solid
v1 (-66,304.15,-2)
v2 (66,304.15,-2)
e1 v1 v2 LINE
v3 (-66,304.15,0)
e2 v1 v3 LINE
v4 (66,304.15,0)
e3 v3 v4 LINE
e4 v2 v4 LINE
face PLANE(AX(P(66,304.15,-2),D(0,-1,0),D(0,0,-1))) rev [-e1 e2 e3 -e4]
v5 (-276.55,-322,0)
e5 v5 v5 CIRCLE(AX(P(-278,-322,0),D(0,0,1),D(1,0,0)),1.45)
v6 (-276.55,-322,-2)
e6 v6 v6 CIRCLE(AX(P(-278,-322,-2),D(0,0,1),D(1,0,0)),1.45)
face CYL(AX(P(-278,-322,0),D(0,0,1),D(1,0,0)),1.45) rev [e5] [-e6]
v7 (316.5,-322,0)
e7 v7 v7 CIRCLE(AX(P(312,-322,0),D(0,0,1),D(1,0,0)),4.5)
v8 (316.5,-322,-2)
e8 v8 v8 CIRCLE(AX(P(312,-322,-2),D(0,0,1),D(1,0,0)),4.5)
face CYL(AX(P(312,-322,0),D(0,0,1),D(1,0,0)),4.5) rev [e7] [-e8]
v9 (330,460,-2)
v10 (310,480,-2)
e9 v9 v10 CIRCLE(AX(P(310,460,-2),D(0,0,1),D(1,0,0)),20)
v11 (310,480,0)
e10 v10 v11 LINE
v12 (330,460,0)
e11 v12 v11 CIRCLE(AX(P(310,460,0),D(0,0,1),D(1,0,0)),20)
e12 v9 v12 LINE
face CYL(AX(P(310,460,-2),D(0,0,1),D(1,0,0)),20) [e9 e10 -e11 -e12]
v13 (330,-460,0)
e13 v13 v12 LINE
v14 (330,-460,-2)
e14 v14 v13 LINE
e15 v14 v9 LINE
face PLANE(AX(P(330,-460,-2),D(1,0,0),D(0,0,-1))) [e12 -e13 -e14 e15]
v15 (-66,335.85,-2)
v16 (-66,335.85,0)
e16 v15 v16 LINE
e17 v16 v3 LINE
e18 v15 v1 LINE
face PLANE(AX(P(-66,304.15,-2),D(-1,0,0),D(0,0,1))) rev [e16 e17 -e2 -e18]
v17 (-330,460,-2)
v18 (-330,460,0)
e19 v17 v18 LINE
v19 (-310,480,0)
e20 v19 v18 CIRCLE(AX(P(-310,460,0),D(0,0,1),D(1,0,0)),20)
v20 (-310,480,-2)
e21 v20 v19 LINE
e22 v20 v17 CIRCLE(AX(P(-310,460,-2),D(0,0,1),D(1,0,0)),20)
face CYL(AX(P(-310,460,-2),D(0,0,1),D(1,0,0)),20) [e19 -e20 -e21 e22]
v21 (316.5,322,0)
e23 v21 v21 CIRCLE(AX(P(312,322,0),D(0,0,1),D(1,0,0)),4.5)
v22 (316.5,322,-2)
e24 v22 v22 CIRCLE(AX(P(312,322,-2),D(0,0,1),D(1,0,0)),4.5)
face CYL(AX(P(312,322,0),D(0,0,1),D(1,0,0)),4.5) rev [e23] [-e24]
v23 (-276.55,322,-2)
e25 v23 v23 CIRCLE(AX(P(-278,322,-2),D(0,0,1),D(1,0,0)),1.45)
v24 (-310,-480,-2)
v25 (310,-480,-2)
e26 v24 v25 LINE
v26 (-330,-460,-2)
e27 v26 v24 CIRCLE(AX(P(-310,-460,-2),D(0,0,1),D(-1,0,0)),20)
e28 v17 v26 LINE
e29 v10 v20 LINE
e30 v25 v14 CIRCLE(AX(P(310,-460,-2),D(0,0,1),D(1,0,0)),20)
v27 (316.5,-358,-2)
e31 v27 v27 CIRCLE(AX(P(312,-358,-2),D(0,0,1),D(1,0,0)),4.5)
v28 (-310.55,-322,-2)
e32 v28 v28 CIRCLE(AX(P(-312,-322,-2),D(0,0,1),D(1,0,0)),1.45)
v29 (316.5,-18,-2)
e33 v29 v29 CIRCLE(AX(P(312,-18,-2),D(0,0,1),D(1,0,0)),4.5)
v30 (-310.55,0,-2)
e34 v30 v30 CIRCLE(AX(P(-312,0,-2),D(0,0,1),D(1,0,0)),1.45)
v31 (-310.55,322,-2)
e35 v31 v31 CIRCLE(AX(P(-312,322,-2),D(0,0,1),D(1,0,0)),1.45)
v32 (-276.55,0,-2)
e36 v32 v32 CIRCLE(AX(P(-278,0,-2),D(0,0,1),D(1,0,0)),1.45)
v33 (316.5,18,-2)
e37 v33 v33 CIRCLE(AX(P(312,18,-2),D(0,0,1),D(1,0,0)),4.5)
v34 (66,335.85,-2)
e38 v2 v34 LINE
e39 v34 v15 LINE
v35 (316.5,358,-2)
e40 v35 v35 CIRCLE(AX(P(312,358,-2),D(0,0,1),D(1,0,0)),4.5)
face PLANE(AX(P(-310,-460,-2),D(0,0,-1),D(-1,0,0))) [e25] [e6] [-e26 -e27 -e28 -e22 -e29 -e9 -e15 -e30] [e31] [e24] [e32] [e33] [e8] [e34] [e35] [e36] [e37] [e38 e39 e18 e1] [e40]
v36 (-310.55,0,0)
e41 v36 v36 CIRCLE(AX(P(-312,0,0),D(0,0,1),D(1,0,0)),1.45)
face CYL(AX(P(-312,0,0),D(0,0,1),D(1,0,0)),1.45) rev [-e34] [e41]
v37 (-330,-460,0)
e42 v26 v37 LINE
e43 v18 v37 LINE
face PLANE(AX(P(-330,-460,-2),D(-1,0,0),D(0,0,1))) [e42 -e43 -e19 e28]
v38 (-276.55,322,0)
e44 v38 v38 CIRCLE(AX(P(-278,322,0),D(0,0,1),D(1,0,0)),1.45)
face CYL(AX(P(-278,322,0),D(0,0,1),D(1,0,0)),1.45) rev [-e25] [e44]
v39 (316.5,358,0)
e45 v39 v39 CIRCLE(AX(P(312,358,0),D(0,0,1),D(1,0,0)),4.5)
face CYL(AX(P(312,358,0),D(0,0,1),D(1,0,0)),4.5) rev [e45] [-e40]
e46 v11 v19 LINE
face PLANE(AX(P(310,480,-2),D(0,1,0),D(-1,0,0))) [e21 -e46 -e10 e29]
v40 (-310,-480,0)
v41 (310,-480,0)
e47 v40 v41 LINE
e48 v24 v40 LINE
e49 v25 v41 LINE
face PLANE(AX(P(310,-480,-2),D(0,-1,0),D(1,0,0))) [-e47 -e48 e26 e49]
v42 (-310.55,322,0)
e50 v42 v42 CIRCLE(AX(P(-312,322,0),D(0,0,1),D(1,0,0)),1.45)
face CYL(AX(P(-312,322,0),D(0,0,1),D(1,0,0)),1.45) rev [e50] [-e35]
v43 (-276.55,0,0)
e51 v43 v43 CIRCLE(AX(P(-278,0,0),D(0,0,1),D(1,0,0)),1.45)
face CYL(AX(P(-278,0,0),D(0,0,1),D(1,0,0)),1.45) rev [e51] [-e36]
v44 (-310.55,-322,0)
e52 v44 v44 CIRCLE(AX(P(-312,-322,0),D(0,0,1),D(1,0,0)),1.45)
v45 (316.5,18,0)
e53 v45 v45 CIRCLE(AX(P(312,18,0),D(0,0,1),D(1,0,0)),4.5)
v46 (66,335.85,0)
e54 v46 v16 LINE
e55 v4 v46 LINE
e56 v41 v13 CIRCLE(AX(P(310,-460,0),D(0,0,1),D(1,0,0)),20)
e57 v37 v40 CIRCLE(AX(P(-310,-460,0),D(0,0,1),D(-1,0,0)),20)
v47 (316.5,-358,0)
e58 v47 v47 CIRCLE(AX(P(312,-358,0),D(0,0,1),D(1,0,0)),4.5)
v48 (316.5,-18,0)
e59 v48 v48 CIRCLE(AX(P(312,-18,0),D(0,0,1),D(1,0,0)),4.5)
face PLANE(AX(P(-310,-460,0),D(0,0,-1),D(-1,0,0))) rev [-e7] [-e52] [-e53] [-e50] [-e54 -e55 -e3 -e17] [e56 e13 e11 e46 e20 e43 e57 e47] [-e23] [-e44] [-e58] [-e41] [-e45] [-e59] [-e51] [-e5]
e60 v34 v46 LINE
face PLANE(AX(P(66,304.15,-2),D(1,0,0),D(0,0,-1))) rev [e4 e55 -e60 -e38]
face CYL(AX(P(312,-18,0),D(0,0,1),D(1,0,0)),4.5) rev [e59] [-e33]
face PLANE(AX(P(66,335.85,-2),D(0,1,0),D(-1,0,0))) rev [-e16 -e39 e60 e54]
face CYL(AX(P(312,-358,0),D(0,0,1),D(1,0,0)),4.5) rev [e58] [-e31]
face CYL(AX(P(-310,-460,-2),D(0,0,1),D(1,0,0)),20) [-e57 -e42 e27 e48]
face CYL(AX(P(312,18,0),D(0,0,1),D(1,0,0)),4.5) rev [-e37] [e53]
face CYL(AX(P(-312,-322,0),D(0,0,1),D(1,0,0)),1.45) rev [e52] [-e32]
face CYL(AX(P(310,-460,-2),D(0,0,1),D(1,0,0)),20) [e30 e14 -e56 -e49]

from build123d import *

# Parameters (mm, degrees)
BASE_FLANGE1_DEPTH     = 2
M8_CLEARANCE_HOLE1_D   = 9
SKETCH8_W              = 132
SKETCH8_H              = 31.7
CUT_EXTRUDE1_DEPTH     = 10
M2_5_CLEARANCE_HOLE2_D = 2.9


# Sheet-metal steps are written as plain solids
with BuildPart() as part:
    # Sketch1 → Base-Flange1 (new body)
    with BuildSketch(Plane.XY):
        with BuildLine():
            Line((310, -480), (-310, -480))
            ThreePointArc((-310, -480), (-324.142135624, -474.142135624), (-330, -460))
            Line((-330, -460), (-330, 460))
            ThreePointArc((-330, 460), (-324.142135624, 474.142135624), (-310, 480))
            Line((-310, 480), (310, 480))
            ThreePointArc((310, 480), (324.142135624, 474.142135624), (330, 460))
            Line((330, 460), (330, -460))
            ThreePointArc((330, -460), (324.142135624, -474.142135624), (310, -480))
        make_face()
    extrude(amount=-BASE_FLANGE1_DEPTH)

    # M8 Clearance Hole1 (through all)
    with Locations(Plane.XY):
        with Locations((312, 358), (312, 322), (312, 18), (312, -18), (312, -322), (312, -358)):
            Hole(M8_CLEARANCE_HOLE1_D / 2)

    # Sketch8 → Cut-Extrude1 (cut)
    with BuildSketch(Plane.XY):
        with Locations((0, 320)):
            Rectangle(SKETCH8_W, SKETCH8_H)
    extrude(amount=-CUT_EXTRUDE1_DEPTH, mode=Mode.SUBTRACT)

    # M2.5 Clearance Hole2 (through all)
    with Locations(Plane.XY):
        with Locations((-277.999999662, -322), (-311.999999662, 322), (-277.999999662, 322), (-311.999999662, 0), (-277.999999662, 0), (-311.999999662, -322)):
            Hole(M2_5_CLEARANCE_HOLE2_D / 2)


solid = part.part
